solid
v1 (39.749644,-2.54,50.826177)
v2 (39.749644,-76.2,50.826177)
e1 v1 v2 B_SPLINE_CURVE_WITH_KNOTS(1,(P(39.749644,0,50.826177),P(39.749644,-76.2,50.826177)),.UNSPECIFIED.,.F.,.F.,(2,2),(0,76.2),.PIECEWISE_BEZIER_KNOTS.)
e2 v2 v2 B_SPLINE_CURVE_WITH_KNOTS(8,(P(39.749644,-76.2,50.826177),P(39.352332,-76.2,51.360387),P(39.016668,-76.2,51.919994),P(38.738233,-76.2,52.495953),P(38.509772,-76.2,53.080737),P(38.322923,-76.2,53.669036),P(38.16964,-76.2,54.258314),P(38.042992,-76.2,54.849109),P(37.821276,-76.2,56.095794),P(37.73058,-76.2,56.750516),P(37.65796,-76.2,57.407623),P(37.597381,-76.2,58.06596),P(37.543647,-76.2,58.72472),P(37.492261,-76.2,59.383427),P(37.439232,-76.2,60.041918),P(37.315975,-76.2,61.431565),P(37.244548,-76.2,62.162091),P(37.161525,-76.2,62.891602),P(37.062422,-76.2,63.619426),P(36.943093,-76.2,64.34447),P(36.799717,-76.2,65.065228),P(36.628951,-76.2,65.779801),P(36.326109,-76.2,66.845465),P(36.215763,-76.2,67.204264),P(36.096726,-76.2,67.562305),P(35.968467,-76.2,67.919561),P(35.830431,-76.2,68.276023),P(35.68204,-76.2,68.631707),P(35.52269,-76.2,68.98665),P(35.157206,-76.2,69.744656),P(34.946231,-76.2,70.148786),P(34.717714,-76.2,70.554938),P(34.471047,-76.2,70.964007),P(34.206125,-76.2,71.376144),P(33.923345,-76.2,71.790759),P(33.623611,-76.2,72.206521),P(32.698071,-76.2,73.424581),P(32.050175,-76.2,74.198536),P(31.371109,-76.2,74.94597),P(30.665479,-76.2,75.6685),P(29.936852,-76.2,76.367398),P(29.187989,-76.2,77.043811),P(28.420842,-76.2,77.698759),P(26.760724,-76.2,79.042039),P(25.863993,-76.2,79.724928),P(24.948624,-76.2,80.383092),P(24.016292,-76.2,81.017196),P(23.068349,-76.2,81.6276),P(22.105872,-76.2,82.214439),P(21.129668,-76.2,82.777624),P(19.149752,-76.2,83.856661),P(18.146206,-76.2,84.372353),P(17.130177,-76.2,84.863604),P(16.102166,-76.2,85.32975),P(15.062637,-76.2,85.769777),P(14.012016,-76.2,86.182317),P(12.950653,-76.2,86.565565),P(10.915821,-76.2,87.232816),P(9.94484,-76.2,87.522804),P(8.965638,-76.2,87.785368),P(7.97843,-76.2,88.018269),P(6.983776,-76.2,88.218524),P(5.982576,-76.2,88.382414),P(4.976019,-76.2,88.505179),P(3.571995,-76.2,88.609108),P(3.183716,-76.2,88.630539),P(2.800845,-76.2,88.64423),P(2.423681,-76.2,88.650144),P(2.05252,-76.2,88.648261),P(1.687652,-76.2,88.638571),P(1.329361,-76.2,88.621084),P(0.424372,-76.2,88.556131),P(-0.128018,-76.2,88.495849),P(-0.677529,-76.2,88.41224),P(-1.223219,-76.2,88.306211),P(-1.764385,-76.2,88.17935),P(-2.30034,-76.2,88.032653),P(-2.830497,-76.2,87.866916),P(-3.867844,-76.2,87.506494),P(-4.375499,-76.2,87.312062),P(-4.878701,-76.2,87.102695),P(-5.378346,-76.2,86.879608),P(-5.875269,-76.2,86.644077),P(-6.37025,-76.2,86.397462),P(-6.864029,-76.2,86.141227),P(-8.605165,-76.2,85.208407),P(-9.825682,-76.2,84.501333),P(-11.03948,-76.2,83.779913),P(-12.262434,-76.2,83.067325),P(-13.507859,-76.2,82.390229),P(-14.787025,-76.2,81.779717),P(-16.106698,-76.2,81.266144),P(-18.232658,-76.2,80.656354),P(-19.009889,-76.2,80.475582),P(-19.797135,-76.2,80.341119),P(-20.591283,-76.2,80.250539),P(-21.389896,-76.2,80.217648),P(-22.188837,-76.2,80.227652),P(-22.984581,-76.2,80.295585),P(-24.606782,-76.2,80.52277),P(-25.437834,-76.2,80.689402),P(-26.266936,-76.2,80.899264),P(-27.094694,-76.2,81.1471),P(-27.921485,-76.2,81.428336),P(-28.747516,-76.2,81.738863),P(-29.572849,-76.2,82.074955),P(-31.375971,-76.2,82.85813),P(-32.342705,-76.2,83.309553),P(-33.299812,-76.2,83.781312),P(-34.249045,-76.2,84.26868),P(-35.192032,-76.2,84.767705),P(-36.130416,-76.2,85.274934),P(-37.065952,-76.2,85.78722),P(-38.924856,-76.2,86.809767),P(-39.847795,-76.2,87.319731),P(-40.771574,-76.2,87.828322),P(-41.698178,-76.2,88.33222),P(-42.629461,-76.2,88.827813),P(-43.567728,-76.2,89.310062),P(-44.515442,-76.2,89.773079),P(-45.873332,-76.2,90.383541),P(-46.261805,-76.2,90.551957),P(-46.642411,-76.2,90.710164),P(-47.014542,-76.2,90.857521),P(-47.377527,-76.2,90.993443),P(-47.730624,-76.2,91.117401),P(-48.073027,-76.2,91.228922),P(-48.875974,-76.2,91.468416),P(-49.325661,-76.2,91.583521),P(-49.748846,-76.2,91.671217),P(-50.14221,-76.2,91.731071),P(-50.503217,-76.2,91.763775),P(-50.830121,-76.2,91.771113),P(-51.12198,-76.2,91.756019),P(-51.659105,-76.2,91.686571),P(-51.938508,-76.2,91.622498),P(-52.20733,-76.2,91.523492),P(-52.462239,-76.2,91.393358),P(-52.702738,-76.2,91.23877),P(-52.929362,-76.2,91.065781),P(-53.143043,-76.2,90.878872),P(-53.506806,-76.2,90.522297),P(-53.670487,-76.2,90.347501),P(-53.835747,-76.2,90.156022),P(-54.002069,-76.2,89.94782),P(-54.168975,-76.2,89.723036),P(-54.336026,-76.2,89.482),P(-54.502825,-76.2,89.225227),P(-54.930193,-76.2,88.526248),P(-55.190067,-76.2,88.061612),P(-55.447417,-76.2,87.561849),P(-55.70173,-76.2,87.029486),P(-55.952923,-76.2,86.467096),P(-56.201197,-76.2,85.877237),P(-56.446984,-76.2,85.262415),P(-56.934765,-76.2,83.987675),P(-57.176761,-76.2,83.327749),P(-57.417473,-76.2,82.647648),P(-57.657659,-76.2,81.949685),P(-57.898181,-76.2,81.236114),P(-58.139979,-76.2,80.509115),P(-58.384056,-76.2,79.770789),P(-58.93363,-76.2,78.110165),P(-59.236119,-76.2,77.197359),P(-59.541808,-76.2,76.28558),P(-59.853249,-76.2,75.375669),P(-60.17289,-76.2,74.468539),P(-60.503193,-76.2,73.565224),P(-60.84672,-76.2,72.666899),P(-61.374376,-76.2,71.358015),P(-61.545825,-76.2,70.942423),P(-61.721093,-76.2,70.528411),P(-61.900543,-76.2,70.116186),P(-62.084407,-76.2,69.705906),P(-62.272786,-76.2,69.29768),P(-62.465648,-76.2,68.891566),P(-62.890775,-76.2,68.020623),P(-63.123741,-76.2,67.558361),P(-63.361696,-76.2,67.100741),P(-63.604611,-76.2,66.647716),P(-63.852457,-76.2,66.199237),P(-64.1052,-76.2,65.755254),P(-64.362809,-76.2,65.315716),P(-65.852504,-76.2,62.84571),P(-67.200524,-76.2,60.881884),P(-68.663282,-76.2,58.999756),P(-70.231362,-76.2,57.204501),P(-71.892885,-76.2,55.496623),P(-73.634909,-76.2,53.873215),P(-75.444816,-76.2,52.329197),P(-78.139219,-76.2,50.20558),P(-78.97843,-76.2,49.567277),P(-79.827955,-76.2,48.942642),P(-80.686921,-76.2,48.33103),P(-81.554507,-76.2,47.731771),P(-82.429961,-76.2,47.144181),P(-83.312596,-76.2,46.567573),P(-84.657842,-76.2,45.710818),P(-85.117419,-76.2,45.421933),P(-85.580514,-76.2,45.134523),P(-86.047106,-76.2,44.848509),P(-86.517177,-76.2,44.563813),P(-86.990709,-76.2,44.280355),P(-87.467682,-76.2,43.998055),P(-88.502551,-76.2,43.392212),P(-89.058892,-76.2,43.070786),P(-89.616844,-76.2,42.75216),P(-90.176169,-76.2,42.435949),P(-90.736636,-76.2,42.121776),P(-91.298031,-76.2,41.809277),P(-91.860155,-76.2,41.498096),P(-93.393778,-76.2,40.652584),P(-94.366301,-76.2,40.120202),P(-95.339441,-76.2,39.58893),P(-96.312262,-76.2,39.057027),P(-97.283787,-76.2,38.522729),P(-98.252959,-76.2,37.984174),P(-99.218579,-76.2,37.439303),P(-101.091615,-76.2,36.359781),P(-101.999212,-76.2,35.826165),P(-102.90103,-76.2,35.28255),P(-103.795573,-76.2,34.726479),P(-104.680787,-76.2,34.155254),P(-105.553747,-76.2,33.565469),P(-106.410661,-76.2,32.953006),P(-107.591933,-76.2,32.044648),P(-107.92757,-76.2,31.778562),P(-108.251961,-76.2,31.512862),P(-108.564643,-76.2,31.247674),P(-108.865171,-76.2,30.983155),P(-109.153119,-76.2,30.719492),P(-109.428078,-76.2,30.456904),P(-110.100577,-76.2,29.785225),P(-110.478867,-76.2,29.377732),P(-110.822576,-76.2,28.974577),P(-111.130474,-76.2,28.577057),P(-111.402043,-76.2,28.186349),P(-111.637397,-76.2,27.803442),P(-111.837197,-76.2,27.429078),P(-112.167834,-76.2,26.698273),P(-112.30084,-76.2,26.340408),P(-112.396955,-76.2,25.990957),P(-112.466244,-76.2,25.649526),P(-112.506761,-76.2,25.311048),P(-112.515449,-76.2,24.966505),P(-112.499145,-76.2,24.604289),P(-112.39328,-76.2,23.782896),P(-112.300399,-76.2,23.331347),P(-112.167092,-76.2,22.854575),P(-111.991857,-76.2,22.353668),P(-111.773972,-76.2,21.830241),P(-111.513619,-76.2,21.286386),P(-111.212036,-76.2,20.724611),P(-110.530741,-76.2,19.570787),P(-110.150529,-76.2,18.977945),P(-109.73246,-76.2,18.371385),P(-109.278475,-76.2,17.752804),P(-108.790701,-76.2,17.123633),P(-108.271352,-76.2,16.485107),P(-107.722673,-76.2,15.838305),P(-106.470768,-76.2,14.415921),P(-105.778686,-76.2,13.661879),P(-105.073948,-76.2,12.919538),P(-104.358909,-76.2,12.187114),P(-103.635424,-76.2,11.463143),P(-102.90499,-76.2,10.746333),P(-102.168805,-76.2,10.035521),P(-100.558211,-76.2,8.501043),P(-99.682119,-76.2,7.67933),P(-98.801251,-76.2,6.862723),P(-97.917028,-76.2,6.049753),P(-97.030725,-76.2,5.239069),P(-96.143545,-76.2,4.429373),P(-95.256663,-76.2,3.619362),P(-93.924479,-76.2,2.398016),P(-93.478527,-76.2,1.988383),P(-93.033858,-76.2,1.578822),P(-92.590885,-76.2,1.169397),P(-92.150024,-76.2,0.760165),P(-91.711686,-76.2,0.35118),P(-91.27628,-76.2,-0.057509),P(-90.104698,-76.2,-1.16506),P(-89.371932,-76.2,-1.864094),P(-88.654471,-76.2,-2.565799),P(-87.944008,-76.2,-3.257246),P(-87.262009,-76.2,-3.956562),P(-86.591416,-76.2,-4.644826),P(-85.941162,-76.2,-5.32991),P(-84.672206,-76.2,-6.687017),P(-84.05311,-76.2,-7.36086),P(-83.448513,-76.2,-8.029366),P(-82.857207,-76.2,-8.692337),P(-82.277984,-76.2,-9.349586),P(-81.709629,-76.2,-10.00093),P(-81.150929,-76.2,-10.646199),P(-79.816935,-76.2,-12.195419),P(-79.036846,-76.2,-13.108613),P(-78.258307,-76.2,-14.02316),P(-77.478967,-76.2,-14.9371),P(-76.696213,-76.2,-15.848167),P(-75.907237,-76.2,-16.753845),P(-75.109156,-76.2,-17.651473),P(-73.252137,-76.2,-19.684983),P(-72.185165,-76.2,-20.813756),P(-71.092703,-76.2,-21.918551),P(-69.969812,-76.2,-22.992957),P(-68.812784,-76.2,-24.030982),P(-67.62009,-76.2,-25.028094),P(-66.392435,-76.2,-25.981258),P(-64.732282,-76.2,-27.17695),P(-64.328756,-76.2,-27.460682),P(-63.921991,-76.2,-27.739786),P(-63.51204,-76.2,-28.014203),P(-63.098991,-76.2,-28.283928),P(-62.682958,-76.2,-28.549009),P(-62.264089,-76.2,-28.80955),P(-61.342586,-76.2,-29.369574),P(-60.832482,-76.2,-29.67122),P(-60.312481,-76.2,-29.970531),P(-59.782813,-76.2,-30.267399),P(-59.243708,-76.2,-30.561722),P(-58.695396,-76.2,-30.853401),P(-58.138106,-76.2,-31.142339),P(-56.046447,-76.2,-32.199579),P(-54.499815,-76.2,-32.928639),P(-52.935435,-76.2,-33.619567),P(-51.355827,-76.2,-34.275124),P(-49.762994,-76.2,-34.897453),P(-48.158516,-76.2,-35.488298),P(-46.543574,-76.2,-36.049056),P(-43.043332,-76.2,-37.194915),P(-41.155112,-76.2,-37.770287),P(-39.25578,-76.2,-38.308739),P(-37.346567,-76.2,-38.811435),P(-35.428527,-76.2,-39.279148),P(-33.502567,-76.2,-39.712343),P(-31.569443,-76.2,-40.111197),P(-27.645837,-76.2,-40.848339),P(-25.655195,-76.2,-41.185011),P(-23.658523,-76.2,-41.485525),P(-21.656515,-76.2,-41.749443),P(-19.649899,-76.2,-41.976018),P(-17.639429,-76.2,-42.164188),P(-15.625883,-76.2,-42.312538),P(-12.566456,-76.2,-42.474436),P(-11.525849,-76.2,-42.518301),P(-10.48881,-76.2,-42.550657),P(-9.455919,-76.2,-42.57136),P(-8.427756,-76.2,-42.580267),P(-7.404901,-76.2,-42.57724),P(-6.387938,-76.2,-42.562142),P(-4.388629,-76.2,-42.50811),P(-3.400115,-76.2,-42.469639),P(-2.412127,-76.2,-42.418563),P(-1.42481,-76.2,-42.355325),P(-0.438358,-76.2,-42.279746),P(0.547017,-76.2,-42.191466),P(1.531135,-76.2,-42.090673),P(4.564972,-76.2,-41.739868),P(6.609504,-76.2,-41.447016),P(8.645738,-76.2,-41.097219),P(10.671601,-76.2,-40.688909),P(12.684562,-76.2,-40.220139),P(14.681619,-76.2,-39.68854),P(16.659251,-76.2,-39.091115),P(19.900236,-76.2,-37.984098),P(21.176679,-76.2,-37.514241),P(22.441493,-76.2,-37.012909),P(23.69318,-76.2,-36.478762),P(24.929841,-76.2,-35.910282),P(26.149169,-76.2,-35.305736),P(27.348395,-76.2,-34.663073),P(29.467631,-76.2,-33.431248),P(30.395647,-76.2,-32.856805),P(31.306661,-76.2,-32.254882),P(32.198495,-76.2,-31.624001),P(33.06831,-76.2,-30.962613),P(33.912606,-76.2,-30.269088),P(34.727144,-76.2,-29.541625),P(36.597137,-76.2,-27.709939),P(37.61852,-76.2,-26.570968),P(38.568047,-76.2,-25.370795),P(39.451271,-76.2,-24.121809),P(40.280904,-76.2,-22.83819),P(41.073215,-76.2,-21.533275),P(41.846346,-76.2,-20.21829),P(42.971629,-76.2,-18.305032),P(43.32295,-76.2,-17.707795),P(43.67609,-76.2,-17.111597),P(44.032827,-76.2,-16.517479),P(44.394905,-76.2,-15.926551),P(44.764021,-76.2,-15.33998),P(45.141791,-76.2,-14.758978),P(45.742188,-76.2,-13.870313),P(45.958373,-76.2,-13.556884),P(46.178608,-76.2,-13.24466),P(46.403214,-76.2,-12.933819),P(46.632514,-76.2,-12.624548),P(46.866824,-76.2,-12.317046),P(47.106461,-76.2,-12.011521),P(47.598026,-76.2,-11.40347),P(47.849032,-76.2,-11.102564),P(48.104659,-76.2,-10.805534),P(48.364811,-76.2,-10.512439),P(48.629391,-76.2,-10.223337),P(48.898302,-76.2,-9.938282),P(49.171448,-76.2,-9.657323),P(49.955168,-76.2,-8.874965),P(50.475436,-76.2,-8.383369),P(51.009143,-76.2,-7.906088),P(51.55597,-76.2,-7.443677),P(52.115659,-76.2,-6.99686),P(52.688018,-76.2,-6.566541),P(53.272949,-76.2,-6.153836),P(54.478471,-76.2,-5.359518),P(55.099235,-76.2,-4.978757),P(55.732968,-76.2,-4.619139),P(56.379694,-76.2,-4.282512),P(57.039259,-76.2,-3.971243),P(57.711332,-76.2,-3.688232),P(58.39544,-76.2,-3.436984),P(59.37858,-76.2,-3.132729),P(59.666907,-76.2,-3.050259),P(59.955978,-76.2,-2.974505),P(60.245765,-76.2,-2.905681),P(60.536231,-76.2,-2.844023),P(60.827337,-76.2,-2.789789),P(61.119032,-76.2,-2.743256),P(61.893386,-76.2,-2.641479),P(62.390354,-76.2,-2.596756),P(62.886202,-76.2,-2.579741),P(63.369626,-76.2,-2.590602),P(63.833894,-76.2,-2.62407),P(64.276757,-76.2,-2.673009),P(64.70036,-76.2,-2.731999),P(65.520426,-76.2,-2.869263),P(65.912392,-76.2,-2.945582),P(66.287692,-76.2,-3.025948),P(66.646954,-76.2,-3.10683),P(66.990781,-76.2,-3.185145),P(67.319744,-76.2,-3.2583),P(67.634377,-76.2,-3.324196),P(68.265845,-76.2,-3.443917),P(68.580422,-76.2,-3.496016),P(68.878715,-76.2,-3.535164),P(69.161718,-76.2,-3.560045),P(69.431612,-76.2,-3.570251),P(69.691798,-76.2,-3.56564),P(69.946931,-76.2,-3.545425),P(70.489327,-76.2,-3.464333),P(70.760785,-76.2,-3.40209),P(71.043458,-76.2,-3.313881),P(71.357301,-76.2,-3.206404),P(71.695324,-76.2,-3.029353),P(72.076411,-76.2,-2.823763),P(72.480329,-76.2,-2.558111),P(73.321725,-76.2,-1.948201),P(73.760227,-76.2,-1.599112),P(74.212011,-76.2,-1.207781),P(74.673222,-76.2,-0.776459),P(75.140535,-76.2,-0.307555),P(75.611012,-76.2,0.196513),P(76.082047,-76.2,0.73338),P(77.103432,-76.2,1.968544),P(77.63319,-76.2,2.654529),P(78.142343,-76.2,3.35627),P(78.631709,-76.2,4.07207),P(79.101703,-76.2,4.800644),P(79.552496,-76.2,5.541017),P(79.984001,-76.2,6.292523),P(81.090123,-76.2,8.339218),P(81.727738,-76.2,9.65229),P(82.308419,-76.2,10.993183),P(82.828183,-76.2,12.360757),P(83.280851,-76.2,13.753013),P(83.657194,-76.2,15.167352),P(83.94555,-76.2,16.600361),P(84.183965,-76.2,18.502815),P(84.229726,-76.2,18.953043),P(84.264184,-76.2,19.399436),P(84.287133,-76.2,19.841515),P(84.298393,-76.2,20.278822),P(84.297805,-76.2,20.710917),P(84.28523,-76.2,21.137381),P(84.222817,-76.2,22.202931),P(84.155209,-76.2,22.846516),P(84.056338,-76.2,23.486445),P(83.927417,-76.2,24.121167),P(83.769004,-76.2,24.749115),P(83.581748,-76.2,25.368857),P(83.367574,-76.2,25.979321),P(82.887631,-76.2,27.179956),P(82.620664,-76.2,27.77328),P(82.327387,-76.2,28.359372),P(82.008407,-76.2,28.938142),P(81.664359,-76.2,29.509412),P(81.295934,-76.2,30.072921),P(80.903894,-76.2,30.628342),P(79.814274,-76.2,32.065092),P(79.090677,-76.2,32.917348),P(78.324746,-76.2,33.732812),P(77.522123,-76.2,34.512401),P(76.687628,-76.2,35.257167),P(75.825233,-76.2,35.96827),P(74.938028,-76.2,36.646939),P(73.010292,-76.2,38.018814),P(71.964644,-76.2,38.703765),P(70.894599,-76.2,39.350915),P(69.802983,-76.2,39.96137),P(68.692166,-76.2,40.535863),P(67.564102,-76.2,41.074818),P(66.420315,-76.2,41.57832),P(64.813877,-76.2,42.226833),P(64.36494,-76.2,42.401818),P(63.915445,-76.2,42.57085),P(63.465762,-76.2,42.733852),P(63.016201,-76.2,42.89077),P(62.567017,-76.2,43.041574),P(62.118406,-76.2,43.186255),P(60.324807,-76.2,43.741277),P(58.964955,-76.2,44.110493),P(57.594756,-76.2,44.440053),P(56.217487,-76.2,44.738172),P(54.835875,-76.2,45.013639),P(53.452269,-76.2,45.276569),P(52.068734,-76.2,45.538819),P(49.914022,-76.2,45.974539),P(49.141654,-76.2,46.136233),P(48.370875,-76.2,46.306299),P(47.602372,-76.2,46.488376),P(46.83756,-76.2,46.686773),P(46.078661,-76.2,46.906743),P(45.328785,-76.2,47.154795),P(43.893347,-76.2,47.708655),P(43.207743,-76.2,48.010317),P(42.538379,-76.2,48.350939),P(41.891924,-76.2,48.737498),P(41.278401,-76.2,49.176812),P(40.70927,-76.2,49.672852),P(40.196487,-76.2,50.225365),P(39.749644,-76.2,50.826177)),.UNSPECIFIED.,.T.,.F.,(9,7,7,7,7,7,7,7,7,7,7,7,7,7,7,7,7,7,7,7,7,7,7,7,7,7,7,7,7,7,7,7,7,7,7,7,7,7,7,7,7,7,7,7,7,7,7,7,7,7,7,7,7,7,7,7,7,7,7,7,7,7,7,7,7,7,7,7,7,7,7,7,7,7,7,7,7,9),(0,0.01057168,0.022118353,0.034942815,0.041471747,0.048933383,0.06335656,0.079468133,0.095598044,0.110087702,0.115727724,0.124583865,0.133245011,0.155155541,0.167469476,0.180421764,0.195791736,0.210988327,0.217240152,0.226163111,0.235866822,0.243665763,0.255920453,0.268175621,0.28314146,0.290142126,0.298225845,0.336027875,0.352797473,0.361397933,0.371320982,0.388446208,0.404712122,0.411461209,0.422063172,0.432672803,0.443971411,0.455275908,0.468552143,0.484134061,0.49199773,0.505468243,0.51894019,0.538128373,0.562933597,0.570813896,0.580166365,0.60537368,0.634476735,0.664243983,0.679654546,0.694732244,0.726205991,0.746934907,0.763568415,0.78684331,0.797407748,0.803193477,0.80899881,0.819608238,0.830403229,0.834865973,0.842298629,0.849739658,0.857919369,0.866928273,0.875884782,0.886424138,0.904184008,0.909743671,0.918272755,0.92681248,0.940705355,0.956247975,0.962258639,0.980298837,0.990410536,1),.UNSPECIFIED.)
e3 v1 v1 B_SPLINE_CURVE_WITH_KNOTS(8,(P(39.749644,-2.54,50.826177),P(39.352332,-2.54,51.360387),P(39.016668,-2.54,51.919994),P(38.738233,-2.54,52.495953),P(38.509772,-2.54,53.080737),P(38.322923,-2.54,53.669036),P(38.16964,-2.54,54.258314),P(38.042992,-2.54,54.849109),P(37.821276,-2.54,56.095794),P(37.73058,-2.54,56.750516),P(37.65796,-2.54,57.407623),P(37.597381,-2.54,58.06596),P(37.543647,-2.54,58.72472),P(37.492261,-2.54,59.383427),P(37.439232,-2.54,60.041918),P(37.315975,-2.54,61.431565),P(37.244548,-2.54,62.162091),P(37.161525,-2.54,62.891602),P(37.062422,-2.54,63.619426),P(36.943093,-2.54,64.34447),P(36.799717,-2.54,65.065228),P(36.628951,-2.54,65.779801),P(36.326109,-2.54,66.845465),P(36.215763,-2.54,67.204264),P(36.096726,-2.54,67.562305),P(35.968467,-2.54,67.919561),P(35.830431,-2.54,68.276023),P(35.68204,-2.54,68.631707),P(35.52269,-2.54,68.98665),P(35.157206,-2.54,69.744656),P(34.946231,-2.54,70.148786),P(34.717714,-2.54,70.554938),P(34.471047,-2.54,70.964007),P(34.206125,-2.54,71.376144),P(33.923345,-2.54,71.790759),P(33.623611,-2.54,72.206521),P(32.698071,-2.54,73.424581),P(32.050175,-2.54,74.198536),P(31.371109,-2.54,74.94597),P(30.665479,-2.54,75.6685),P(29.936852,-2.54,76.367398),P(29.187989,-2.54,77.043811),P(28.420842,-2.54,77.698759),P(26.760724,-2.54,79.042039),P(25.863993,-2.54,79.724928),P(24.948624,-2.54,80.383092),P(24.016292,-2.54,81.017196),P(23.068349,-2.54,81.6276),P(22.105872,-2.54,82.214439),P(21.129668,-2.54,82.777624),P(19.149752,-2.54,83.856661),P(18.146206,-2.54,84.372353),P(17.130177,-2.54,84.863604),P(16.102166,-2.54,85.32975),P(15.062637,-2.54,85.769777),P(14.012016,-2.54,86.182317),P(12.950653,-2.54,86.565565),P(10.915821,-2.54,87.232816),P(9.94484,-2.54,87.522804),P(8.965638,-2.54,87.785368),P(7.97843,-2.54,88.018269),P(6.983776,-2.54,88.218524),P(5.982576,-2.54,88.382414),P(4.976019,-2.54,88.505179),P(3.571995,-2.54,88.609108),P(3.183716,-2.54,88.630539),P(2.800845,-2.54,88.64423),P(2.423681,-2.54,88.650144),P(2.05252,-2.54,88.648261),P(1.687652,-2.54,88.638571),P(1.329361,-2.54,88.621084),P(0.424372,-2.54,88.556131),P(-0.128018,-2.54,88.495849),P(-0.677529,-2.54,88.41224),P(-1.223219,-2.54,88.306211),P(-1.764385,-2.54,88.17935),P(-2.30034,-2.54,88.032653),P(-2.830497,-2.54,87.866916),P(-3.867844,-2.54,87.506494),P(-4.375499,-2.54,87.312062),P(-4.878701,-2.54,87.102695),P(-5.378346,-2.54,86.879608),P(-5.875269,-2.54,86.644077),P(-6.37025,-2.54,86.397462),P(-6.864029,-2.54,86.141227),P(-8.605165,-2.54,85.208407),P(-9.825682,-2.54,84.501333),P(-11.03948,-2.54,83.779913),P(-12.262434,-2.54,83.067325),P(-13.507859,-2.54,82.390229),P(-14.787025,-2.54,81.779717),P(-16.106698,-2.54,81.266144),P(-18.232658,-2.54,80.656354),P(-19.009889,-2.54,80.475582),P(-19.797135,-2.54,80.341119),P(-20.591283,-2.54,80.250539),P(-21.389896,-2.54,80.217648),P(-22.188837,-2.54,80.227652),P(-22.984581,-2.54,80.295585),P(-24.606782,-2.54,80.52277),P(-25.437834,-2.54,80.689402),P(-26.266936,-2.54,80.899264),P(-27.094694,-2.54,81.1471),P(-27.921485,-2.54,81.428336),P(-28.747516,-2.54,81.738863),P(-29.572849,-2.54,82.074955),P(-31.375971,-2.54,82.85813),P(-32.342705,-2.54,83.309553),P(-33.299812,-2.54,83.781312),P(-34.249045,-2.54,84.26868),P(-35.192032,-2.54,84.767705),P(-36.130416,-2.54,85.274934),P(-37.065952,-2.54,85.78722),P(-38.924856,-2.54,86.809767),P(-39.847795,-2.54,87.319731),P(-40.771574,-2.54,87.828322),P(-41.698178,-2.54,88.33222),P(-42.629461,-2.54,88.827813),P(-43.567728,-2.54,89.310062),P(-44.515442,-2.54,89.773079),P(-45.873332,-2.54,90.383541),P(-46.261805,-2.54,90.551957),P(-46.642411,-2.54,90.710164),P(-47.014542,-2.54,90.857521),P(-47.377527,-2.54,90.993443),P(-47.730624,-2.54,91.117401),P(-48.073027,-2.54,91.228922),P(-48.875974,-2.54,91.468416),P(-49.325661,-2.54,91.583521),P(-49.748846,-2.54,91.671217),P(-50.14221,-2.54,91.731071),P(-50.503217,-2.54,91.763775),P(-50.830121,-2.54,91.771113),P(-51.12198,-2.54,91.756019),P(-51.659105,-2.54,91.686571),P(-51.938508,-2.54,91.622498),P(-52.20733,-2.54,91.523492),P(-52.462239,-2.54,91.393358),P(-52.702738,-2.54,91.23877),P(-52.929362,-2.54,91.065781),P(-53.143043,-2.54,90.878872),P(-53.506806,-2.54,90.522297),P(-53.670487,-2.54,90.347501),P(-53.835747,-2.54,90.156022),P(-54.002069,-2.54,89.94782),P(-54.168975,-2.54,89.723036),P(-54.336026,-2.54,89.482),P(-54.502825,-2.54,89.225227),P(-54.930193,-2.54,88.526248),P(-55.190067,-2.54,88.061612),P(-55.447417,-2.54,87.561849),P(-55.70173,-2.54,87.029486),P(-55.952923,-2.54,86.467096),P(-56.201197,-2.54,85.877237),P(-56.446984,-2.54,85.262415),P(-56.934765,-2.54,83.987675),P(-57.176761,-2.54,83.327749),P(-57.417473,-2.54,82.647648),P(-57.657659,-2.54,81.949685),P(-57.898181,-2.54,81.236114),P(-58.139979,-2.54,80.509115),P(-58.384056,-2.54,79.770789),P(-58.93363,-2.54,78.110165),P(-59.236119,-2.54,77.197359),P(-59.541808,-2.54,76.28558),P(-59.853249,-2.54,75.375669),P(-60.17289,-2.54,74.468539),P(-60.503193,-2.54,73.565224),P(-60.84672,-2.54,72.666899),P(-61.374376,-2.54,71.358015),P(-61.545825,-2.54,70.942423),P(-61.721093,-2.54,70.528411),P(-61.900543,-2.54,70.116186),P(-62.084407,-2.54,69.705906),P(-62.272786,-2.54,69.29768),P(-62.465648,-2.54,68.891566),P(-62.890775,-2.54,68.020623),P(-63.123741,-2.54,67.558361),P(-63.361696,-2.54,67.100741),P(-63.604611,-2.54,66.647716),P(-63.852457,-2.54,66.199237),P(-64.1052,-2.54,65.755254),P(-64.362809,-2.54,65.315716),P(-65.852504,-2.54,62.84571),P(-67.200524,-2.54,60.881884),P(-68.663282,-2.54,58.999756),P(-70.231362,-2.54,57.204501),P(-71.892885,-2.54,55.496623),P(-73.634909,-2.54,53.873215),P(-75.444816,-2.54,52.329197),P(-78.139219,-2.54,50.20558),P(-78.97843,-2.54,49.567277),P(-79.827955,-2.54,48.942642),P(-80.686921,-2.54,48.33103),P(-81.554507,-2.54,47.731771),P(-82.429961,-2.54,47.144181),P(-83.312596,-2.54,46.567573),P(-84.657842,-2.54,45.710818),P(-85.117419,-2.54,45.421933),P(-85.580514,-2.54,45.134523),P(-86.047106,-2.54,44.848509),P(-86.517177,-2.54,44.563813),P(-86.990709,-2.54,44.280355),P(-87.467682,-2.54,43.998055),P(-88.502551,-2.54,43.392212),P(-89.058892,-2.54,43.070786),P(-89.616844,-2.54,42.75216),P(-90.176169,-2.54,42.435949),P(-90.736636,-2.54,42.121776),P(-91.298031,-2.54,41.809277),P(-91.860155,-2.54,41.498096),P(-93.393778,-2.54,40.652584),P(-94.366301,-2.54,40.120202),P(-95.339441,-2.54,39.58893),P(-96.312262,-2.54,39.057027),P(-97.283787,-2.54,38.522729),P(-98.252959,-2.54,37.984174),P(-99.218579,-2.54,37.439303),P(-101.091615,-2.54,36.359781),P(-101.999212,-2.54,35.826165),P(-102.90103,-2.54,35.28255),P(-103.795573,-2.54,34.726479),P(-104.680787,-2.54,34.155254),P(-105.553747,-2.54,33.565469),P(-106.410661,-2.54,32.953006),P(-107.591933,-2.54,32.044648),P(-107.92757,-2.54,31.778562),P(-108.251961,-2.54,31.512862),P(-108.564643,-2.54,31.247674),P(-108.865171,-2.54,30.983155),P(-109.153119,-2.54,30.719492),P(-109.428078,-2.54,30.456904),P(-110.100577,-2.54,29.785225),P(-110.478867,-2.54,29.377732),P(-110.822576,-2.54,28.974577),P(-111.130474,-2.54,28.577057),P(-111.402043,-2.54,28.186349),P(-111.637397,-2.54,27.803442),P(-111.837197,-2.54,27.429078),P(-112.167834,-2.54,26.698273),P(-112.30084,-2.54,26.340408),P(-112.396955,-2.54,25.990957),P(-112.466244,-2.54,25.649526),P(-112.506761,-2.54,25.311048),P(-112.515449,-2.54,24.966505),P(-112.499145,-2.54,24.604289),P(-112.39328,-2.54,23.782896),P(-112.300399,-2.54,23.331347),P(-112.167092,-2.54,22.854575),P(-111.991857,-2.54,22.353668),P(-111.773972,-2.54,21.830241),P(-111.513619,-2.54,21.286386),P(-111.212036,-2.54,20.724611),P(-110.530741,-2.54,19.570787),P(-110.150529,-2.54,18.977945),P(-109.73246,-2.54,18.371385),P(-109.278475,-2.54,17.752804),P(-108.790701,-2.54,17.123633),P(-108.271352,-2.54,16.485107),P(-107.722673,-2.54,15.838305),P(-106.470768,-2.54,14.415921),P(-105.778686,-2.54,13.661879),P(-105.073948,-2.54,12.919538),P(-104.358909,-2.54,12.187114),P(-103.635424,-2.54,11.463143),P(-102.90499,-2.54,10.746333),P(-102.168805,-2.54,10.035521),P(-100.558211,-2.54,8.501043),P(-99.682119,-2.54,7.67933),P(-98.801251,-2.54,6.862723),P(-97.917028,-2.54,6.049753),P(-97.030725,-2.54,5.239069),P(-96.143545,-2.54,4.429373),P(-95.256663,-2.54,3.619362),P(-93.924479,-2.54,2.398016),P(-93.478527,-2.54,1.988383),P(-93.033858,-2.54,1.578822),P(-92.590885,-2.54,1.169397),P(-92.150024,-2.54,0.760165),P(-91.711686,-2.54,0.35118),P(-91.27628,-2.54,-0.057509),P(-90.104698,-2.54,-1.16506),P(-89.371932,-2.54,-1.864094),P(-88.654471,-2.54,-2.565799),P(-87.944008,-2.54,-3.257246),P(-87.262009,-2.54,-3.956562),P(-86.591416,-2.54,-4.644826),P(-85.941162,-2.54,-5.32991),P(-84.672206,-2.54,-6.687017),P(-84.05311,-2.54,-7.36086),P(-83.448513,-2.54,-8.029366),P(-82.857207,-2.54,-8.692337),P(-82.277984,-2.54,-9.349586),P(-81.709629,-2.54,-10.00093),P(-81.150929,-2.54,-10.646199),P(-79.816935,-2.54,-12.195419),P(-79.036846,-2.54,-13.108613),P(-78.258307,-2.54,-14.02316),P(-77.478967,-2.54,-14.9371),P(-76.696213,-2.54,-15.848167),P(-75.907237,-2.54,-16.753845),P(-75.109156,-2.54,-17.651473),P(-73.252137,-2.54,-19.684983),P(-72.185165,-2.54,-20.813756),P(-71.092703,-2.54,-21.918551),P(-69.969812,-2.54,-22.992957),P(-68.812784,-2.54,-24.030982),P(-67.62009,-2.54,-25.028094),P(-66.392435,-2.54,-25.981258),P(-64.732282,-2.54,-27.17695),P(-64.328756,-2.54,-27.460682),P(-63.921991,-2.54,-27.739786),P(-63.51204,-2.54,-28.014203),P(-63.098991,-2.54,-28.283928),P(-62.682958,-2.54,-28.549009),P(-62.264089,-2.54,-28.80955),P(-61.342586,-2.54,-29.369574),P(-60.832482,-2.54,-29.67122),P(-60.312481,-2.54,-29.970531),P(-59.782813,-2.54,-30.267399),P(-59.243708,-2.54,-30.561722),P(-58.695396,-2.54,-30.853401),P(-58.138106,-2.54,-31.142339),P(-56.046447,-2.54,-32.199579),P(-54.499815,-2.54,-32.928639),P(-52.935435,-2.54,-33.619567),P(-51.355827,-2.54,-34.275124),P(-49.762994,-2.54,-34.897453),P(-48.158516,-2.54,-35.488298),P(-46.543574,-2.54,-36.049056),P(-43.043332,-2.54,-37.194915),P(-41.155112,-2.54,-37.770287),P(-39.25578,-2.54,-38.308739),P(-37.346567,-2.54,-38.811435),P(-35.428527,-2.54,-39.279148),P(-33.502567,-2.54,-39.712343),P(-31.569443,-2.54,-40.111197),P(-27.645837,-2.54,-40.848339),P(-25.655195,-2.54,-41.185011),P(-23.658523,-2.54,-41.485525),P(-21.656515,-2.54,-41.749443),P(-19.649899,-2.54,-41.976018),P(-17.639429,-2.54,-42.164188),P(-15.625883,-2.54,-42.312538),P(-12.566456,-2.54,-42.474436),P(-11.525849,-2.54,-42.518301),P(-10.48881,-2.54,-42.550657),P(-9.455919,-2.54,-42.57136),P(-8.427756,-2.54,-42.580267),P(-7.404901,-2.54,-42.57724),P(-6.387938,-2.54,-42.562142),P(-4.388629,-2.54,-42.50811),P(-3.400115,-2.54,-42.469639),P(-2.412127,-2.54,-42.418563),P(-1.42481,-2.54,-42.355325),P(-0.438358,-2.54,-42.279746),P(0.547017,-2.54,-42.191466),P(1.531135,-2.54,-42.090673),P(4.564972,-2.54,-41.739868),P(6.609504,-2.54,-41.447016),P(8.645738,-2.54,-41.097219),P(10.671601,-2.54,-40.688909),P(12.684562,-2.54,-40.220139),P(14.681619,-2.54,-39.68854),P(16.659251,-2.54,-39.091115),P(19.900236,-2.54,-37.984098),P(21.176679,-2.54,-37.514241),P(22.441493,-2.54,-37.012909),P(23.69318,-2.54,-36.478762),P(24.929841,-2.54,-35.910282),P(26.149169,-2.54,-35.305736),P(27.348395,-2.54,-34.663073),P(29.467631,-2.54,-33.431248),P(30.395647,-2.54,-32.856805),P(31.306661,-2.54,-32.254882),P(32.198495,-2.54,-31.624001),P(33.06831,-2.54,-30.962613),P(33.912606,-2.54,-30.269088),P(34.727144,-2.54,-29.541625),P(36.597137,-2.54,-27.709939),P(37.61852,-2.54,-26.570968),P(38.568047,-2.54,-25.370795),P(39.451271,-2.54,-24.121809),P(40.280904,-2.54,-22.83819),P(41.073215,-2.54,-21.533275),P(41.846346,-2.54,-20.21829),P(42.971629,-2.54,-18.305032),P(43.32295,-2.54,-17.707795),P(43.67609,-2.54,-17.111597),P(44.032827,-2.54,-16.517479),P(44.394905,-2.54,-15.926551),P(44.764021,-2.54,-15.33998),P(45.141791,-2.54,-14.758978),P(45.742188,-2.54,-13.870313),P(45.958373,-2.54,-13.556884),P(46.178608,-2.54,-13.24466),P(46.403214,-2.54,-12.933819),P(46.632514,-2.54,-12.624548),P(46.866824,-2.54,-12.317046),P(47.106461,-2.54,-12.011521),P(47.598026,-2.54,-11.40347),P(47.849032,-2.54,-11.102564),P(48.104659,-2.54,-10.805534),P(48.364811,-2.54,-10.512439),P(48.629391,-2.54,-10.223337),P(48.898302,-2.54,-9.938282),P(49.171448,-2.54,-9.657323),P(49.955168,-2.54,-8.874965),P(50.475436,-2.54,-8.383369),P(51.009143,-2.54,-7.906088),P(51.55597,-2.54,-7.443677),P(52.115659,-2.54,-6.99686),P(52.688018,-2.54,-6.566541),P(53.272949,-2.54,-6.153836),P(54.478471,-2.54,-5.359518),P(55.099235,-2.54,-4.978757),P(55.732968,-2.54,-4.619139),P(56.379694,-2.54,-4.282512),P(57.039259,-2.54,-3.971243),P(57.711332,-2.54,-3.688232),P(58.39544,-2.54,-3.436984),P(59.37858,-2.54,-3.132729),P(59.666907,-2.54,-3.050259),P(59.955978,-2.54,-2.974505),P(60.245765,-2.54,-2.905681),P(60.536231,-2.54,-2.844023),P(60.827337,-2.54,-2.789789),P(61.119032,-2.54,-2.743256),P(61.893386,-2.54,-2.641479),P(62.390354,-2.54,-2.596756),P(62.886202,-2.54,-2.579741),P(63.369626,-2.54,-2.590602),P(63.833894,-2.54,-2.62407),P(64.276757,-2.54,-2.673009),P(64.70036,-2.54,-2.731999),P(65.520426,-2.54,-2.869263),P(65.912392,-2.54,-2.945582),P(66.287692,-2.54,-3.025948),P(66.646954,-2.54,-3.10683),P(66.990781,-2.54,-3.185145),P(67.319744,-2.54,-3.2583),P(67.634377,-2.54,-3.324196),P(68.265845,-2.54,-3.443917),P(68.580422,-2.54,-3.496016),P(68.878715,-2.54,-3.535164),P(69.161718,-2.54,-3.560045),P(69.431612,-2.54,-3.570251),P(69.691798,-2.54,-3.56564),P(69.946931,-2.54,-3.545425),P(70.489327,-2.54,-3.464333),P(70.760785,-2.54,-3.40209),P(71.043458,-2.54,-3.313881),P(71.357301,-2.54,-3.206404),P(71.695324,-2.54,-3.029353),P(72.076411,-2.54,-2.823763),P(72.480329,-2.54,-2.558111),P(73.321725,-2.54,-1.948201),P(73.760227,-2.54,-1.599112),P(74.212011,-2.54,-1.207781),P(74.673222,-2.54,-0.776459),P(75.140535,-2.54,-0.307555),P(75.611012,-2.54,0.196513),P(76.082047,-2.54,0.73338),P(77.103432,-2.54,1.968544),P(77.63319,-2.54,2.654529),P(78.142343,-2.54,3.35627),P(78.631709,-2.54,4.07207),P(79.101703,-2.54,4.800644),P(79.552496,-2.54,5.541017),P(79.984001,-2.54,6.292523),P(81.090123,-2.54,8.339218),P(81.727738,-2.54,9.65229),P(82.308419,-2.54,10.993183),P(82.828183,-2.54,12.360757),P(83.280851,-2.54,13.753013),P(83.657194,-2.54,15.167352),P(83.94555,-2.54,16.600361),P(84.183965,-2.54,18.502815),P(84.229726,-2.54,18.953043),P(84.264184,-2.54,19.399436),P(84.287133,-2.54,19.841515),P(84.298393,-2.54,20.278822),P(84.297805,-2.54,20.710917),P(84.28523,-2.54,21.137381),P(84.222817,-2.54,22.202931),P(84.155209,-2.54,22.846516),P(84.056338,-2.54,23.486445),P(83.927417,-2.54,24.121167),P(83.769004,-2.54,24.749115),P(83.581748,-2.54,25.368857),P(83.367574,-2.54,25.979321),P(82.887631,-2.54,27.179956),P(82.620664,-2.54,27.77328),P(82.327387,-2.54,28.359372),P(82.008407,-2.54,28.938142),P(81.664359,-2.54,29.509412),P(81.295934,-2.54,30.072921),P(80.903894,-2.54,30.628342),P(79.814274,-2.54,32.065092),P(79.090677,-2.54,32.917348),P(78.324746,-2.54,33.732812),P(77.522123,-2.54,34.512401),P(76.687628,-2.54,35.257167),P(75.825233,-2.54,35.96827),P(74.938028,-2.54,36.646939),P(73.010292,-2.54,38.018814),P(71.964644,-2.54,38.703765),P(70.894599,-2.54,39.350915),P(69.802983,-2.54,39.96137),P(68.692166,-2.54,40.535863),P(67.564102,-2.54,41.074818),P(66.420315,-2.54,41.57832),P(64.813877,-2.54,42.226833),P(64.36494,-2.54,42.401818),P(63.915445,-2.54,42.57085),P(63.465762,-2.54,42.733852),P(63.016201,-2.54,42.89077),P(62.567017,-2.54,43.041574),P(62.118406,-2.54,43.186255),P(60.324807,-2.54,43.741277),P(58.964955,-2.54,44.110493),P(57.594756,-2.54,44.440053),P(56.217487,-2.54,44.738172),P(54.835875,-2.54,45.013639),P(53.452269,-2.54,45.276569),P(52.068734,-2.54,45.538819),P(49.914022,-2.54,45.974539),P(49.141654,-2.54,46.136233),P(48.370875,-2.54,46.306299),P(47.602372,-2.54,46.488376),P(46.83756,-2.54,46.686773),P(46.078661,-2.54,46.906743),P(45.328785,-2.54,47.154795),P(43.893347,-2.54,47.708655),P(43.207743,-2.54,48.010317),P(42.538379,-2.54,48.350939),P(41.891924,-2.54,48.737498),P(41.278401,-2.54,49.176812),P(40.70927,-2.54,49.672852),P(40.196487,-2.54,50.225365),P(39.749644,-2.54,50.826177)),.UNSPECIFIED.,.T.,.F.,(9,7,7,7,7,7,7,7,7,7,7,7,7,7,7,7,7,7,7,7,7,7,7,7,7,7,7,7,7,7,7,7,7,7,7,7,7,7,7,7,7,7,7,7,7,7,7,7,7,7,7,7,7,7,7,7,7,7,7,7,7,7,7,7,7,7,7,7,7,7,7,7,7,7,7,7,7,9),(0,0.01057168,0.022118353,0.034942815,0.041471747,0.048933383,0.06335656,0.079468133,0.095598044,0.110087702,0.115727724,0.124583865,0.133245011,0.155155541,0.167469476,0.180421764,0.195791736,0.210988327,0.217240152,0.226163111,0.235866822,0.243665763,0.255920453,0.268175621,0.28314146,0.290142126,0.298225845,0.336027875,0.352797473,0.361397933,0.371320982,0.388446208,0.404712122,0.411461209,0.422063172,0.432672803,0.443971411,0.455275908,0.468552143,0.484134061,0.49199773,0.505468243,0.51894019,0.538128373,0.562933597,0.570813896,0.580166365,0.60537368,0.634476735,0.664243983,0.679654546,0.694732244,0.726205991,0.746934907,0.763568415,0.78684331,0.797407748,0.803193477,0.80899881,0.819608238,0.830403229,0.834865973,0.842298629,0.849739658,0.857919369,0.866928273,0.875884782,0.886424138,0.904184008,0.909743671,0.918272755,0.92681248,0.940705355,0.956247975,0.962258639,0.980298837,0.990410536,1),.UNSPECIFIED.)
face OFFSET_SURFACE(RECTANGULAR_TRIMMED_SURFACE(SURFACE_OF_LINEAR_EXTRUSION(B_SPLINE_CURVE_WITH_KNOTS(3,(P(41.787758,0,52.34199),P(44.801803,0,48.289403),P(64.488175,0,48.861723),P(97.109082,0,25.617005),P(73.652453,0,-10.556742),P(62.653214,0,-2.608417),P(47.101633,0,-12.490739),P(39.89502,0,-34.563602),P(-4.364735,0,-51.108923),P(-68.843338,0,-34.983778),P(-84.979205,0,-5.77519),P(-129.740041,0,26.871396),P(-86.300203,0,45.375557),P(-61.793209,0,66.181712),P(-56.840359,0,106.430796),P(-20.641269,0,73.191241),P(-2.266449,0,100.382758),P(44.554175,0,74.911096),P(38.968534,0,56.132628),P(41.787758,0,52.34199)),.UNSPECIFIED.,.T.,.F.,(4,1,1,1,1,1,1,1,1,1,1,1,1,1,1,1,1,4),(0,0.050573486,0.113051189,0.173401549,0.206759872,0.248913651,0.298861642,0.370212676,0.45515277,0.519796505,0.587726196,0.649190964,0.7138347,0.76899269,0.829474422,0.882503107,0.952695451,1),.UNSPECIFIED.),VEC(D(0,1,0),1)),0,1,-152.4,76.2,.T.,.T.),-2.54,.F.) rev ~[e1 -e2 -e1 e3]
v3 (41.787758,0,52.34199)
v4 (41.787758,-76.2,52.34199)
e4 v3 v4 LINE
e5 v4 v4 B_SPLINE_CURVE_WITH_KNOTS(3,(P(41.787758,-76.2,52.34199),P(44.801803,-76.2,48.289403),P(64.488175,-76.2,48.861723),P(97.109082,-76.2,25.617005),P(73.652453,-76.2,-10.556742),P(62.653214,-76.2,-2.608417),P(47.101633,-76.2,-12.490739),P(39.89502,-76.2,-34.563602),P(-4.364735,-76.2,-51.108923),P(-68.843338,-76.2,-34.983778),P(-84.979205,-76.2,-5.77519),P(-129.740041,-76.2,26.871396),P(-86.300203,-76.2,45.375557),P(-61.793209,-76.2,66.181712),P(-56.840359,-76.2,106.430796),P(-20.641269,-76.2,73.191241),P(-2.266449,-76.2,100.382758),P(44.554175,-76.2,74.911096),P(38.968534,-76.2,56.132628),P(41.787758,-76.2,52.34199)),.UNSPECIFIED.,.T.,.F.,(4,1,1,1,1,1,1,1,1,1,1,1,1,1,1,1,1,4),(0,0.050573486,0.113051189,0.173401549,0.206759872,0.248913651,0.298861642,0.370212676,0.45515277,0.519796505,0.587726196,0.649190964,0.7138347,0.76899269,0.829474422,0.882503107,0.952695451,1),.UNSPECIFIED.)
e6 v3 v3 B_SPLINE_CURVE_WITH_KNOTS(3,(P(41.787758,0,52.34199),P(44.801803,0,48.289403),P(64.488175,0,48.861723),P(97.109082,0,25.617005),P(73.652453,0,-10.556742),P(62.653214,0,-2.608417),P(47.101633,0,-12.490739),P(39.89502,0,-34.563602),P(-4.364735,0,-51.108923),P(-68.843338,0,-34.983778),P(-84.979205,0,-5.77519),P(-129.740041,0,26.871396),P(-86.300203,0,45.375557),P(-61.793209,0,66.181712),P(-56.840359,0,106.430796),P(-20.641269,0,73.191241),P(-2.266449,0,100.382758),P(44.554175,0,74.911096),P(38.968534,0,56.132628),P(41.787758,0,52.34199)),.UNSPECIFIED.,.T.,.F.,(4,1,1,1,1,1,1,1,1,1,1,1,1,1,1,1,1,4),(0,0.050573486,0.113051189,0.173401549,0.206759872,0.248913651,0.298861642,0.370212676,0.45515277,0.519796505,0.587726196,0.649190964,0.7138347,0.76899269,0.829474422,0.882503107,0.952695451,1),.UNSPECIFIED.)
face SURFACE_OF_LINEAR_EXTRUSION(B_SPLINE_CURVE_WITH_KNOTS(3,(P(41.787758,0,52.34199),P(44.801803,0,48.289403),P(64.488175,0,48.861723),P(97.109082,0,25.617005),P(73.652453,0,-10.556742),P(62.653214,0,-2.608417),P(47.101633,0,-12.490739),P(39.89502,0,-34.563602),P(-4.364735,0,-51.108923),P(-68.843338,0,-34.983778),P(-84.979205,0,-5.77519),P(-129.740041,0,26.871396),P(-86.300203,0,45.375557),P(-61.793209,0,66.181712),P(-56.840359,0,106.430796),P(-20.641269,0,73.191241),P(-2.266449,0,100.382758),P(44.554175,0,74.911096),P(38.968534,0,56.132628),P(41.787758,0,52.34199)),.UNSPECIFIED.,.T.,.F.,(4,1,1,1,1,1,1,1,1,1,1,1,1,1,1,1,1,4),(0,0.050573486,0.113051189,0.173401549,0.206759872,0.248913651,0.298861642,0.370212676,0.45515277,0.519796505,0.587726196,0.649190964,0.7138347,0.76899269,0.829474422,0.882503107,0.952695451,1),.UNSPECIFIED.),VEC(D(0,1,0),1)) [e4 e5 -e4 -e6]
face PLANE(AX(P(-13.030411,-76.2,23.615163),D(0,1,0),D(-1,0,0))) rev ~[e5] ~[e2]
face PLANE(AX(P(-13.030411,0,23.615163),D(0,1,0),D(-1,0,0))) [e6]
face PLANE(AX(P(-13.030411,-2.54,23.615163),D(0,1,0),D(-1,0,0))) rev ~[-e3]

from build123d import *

# Parameters (mm, degrees)
F1_DEPTH = 76.2
F2_T     = -2.54


with BuildPart() as f1:
    # F0 (on Front) → F1 (new body)
    with BuildSketch(Plane.XZ):
        with BuildLine():
            add(Edge.make_bspline(
                [(41.7877584696, 52.3419901729), (44.8018027838, 48.2894034099), (64.4881749943, 48.8617228919), (97.1090820354, 25.6170049562), (73.6524525111, -10.5567415214), (62.6532135389, -2.6084169176), (47.1016330699, -12.4907392198), (39.8950198203, -34.5636019236), (-4.3647350441, -51.1089230817), (-68.8433379183, -34.9837775872), (-84.9792045589, -5.7751896586), (-129.7400412914, 26.8713959161), (-86.3002032434, 45.375556858), (-61.7932088079, 66.1817124447), (-56.8403586929, 106.430796245), (-20.6412690628, 73.191240814), (-2.2664490215, 100.382757886), (44.5541749084, 74.9110955698), (38.9685340092, 56.1326284445), (41.7877584696, 52.3419901729)],
                knots=[0, 0, 0, 0, 0.0505734858, 0.1130511893, 0.1734015489, 0.2067598716, 0.2489136506, 0.2988616417, 0.3702126757, 0.45515277, 0.5197965051, 0.5877261956, 0.6491909644, 0.7138346995, 0.7689926899, 0.8294744224, 0.8825031066, 0.9526954506, 1, 1, 1, 1], degree=3))
        make_face()
    extrude(amount=F1_DEPTH)

    # F2
    f2_openings = [f1.faces().sort_by_distance(p)[0] for p in [
        (-13.60377, -76.2, 21.839055),
    ]]
    offset(amount=F2_T, openings=f2_openings)


solid = f1.part
